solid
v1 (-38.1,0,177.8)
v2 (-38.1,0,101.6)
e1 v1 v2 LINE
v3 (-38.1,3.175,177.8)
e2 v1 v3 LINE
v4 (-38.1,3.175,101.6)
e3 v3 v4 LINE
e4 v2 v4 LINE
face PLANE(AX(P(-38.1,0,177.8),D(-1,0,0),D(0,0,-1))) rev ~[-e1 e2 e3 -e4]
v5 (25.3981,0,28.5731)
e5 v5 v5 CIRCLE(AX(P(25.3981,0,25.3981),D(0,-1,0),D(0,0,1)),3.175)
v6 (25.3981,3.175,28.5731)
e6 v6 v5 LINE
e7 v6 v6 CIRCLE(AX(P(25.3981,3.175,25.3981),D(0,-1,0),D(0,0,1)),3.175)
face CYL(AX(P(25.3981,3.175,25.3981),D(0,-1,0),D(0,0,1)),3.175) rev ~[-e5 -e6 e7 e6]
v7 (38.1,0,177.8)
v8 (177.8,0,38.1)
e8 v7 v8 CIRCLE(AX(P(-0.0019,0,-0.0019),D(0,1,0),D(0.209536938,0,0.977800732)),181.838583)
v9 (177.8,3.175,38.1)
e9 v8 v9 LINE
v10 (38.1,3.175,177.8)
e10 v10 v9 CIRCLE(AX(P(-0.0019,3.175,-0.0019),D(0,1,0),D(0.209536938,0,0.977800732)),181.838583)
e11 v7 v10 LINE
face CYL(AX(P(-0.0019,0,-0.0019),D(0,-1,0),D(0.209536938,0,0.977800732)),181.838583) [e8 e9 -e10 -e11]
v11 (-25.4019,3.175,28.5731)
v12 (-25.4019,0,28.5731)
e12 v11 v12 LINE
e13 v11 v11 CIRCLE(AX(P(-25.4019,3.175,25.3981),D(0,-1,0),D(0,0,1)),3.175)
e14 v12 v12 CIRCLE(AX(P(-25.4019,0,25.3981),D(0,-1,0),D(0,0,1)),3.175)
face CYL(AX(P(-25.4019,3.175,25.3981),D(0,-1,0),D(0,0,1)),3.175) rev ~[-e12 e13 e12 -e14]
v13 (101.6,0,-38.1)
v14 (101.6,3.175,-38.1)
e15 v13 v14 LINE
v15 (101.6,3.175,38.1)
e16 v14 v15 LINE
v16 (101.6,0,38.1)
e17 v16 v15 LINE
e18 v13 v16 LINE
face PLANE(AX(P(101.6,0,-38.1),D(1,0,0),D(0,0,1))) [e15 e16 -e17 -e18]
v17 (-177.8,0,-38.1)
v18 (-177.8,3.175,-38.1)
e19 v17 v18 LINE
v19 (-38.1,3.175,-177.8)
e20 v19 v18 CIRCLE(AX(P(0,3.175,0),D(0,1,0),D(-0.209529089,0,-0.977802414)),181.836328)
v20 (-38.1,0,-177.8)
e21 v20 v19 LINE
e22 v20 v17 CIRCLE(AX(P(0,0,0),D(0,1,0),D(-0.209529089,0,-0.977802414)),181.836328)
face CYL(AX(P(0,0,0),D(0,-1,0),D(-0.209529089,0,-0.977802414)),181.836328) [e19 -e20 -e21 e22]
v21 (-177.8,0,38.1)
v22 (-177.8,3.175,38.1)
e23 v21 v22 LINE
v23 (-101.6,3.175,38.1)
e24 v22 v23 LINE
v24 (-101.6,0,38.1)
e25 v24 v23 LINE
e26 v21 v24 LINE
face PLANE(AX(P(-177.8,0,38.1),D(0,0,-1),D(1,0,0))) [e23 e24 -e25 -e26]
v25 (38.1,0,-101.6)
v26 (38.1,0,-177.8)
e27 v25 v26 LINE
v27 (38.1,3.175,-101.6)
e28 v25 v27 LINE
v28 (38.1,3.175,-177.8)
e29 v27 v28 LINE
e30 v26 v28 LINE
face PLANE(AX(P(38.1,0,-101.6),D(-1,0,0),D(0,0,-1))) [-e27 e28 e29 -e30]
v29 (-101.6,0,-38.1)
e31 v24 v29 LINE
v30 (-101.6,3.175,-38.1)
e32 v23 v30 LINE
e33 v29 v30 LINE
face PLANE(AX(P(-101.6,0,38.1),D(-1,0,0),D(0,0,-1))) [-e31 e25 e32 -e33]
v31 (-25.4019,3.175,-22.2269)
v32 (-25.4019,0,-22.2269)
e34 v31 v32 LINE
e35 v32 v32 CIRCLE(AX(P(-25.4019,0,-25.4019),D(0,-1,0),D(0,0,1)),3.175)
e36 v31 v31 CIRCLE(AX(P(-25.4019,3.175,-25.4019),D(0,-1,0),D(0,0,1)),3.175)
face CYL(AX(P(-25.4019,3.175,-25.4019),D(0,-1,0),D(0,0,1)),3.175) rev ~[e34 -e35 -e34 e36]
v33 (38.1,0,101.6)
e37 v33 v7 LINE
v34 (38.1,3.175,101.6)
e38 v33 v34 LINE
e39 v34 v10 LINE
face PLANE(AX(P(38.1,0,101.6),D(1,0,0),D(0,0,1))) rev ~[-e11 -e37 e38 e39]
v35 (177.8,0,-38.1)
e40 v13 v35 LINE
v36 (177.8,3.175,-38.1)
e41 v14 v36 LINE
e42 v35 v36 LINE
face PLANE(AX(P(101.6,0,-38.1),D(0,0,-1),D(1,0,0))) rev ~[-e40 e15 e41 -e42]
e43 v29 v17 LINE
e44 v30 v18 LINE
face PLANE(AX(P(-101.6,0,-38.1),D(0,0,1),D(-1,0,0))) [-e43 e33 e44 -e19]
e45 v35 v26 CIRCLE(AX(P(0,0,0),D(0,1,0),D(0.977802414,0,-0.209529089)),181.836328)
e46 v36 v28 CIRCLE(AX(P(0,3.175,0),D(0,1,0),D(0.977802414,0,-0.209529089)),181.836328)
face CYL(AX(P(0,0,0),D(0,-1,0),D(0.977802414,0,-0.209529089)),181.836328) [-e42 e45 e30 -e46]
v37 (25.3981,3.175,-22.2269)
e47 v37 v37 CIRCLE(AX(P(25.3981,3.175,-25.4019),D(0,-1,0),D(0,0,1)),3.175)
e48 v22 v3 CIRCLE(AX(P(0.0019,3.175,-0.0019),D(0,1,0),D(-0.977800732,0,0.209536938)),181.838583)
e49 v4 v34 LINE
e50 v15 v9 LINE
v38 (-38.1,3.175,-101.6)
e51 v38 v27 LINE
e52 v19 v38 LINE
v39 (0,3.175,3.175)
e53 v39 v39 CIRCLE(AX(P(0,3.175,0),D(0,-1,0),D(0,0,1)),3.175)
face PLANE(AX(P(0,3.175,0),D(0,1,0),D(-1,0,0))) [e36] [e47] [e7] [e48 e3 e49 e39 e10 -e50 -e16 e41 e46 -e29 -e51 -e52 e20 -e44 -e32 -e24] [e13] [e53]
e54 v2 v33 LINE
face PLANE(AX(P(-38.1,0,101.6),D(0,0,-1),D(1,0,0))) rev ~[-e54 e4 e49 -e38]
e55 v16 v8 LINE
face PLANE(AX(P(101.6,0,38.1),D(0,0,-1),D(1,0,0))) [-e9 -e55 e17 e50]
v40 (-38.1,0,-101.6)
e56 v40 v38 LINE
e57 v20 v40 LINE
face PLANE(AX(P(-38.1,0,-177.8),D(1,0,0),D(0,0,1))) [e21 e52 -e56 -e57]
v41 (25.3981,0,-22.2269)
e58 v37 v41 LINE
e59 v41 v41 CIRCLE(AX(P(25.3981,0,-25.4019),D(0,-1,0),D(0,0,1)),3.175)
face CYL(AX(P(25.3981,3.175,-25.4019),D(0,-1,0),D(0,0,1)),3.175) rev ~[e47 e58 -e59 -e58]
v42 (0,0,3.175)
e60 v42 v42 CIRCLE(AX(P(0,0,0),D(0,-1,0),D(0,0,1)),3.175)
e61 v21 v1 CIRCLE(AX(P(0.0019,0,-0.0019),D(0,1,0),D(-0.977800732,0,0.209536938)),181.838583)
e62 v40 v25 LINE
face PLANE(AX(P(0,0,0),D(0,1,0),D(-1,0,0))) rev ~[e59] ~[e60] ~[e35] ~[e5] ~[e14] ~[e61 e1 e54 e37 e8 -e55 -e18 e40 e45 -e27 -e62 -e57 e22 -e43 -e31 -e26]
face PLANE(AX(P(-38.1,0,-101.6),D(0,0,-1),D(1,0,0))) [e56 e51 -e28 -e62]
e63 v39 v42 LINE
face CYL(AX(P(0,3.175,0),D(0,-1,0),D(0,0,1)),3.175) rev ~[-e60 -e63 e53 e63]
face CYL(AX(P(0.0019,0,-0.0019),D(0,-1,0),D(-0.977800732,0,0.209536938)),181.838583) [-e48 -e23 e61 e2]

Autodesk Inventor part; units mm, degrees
ref_plane "YZ Plane" through (0, 0, 0) normal (1, 0, 0) x (0, 1, 0)
ref_plane "XZ Plane" through (0, 0, 0) normal (0, 1, 0) x (-1, 0, 0)
ref_plane "XY Plane" through (0, 0, 0) normal (0, 0, 1) x (1, 0, 0)
sketch "Sketch1" plane through (0, 0, 0) normal (0, 1, 0) x (-1, 0, 0)
  line L0 (38.1, -177.8) -> (38.1, -101.6)
  line L1 (38.1, -101.6) -> (-38.1, -101.6)
  line L2 (-38.1, -101.6) -> (-38.1, -177.8)
  line L3 (38.1, 177.8) -> (38.1, 101.6)
  line L4 (38.1, 101.6) -> (-38.1, 101.6)
  line L5 (-38.1, 101.6) -> (-38.1, 177.8)
  line L6 (177.8, 38.1) -> (101.6, 38.1)
  line L7 (101.6, 38.1) -> (101.6, -38.1)
  line L8 (101.6, -38.1) -> (177.8, -38.1)
  line L9 (-101.6, -38.1) -> (-177.8, -38.1)
  line L10 (-101.6, -38.1) -> (-101.6, 38.1)
  line L11 (-101.6, 38.1) -> (-177.8, 38.1)
  arc A0 (38.1, -177.8) -> (177.8, -38.1) centre (0, 0) ccw
  arc A1 (-177.8, -38.1) -> (-38.1, -177.8) centre (0, 0) ccw
  arc A2 (177.8, 38.1) -> (38.1, 177.8) centre (-0.0019, -0.0019) ccw
  arc A3 (-38.1, 177.8) -> (-177.8, 38.1) centre (0.0019, -0.0019) ccw
  dimension "d0" = 76.2
  dimension "d2" = 76.2
  dimension "d3" = 76.2
  dimension "d4" = 76.2
  dimension "d5" = 76.2
  dimension "d6" = 76.2
  dimension "d7" = 101.6
  dimension "d8" = 101.6
  dimension "d9" = 38.1
  dimension "d10" = 38.1
  dimension "d11" = 76.2
  dimension "d12" = 76.2
  dimension "d13" = 76.2
  dimension "d14" = 101.6
  dimension "d15" = 38.1
  dimension "d16" = 76.2
  dimension "d17" = 76.2
  dimension "d18" = 76.2
  dimension "d19" = 101.6
  dimension "d20" = 38.1
  dimension "d23" = 0
  dimension "d25" = 0
  dimension "d26" = 181.8363
  dimension "d27" = 181.8363
  dimension "d28" = 181.8386
  dimension "d30" = 181.8386
extrude "Plate1" add sketch "Sketch1" along normal blind 3.175
sketch "Sketch2" plane through (0, 3.175, 0) normal (0, 1, 0) x (1, 0, 0)
  arc A0 (-177.8, -38.1) -> (-38.1, -177.8) centre (0.0019, 0.0019) ccw projected
  arc A1 (38.1, -177.8) -> (177.8, -38.1) centre (-0.0019, 0.0019) ccw projected
  line L0 (-25.4019, -25.3981) -> (25.3981, -25.3981) construction
  line L1 (25.3981, -25.3981) -> (25.3981, 25.4019) construction
  line L2 (25.3981, 25.4019) -> (-25.4019, 25.4019) construction
  line L3 (-25.4019, 25.4019) -> (-25.4019, -25.3981) construction
  dimension "d50" = 50.8
  dimension "d52" = 50.8
  dimension "d53" = 25.4
  dimension "d54" = 25.4
hole "Hole2" at (-25.4019, 3.175, -25.4019) at (25.3981, 3.175, -25.4019) at (25.3981, 3.175, 25.3981) at (-25.4019, 3.175, 25.3981) direction (0, -1, 0) diameter 6.35 depth 3.175
sketch "Sketch3" plane through (0, 3.175, 0) normal (0, 1, 0) x (1, 0, 0)
  arc A0 (177.8, 38.1) -> (38.1, 177.8) centre (0, 0) ccw projected
hole "Hole3" at (0, 3.175, 0) direction (0, -1, 0) diameter 6.35 depth 3.175 tip angle 118
equation "\"d2\" = d0"
equation "\"d3\" = d0"
equation "\"d4\" = d0"
equation "\"d5\" = d6"
equation "\"d8\" = d7"
equation "\"d9\" = 0.5 * d6"
equation "\"d10\" = 0.5 * d6"
equation "\"d11\" = d0"
equation "\"d12\" = d0"
equation "\"d13\" = d6"
equation "\"d14\" = d7"
equation "\"d15\" = 0.5 * d6"
equation "\"d16\" = d6"
equation "\"d17\" = d0"
equation "\"d18\" = d0"
equation "\"d60\" = Thickness"
equation "\"d67\" = Thickness"
equation "\"d19\" = d7"
equation "\"d20\" = 0.5 * d6"
equation "\"BendRadius\" = Thickness"
equation "\"BendReliefWidth\" = Thickness"
equation "\"BendReliefDepth\" = 0.5 * Thickness"
equation "\"CornerReliefSize\" = 4 * Thickness"
equation "\"MinimumRemnant\" = 2 * Thickness"
equation "\"TransitionRadius\" = BendRadius"
equation "\"JacobiRadiusSize\" = BendRadius"
equation "\"GapSize\" = Thickness"
equation "\"d31\" = BendRadius"
equation "\"Thickness\" = 3.175"
properties part number "TopCover"
